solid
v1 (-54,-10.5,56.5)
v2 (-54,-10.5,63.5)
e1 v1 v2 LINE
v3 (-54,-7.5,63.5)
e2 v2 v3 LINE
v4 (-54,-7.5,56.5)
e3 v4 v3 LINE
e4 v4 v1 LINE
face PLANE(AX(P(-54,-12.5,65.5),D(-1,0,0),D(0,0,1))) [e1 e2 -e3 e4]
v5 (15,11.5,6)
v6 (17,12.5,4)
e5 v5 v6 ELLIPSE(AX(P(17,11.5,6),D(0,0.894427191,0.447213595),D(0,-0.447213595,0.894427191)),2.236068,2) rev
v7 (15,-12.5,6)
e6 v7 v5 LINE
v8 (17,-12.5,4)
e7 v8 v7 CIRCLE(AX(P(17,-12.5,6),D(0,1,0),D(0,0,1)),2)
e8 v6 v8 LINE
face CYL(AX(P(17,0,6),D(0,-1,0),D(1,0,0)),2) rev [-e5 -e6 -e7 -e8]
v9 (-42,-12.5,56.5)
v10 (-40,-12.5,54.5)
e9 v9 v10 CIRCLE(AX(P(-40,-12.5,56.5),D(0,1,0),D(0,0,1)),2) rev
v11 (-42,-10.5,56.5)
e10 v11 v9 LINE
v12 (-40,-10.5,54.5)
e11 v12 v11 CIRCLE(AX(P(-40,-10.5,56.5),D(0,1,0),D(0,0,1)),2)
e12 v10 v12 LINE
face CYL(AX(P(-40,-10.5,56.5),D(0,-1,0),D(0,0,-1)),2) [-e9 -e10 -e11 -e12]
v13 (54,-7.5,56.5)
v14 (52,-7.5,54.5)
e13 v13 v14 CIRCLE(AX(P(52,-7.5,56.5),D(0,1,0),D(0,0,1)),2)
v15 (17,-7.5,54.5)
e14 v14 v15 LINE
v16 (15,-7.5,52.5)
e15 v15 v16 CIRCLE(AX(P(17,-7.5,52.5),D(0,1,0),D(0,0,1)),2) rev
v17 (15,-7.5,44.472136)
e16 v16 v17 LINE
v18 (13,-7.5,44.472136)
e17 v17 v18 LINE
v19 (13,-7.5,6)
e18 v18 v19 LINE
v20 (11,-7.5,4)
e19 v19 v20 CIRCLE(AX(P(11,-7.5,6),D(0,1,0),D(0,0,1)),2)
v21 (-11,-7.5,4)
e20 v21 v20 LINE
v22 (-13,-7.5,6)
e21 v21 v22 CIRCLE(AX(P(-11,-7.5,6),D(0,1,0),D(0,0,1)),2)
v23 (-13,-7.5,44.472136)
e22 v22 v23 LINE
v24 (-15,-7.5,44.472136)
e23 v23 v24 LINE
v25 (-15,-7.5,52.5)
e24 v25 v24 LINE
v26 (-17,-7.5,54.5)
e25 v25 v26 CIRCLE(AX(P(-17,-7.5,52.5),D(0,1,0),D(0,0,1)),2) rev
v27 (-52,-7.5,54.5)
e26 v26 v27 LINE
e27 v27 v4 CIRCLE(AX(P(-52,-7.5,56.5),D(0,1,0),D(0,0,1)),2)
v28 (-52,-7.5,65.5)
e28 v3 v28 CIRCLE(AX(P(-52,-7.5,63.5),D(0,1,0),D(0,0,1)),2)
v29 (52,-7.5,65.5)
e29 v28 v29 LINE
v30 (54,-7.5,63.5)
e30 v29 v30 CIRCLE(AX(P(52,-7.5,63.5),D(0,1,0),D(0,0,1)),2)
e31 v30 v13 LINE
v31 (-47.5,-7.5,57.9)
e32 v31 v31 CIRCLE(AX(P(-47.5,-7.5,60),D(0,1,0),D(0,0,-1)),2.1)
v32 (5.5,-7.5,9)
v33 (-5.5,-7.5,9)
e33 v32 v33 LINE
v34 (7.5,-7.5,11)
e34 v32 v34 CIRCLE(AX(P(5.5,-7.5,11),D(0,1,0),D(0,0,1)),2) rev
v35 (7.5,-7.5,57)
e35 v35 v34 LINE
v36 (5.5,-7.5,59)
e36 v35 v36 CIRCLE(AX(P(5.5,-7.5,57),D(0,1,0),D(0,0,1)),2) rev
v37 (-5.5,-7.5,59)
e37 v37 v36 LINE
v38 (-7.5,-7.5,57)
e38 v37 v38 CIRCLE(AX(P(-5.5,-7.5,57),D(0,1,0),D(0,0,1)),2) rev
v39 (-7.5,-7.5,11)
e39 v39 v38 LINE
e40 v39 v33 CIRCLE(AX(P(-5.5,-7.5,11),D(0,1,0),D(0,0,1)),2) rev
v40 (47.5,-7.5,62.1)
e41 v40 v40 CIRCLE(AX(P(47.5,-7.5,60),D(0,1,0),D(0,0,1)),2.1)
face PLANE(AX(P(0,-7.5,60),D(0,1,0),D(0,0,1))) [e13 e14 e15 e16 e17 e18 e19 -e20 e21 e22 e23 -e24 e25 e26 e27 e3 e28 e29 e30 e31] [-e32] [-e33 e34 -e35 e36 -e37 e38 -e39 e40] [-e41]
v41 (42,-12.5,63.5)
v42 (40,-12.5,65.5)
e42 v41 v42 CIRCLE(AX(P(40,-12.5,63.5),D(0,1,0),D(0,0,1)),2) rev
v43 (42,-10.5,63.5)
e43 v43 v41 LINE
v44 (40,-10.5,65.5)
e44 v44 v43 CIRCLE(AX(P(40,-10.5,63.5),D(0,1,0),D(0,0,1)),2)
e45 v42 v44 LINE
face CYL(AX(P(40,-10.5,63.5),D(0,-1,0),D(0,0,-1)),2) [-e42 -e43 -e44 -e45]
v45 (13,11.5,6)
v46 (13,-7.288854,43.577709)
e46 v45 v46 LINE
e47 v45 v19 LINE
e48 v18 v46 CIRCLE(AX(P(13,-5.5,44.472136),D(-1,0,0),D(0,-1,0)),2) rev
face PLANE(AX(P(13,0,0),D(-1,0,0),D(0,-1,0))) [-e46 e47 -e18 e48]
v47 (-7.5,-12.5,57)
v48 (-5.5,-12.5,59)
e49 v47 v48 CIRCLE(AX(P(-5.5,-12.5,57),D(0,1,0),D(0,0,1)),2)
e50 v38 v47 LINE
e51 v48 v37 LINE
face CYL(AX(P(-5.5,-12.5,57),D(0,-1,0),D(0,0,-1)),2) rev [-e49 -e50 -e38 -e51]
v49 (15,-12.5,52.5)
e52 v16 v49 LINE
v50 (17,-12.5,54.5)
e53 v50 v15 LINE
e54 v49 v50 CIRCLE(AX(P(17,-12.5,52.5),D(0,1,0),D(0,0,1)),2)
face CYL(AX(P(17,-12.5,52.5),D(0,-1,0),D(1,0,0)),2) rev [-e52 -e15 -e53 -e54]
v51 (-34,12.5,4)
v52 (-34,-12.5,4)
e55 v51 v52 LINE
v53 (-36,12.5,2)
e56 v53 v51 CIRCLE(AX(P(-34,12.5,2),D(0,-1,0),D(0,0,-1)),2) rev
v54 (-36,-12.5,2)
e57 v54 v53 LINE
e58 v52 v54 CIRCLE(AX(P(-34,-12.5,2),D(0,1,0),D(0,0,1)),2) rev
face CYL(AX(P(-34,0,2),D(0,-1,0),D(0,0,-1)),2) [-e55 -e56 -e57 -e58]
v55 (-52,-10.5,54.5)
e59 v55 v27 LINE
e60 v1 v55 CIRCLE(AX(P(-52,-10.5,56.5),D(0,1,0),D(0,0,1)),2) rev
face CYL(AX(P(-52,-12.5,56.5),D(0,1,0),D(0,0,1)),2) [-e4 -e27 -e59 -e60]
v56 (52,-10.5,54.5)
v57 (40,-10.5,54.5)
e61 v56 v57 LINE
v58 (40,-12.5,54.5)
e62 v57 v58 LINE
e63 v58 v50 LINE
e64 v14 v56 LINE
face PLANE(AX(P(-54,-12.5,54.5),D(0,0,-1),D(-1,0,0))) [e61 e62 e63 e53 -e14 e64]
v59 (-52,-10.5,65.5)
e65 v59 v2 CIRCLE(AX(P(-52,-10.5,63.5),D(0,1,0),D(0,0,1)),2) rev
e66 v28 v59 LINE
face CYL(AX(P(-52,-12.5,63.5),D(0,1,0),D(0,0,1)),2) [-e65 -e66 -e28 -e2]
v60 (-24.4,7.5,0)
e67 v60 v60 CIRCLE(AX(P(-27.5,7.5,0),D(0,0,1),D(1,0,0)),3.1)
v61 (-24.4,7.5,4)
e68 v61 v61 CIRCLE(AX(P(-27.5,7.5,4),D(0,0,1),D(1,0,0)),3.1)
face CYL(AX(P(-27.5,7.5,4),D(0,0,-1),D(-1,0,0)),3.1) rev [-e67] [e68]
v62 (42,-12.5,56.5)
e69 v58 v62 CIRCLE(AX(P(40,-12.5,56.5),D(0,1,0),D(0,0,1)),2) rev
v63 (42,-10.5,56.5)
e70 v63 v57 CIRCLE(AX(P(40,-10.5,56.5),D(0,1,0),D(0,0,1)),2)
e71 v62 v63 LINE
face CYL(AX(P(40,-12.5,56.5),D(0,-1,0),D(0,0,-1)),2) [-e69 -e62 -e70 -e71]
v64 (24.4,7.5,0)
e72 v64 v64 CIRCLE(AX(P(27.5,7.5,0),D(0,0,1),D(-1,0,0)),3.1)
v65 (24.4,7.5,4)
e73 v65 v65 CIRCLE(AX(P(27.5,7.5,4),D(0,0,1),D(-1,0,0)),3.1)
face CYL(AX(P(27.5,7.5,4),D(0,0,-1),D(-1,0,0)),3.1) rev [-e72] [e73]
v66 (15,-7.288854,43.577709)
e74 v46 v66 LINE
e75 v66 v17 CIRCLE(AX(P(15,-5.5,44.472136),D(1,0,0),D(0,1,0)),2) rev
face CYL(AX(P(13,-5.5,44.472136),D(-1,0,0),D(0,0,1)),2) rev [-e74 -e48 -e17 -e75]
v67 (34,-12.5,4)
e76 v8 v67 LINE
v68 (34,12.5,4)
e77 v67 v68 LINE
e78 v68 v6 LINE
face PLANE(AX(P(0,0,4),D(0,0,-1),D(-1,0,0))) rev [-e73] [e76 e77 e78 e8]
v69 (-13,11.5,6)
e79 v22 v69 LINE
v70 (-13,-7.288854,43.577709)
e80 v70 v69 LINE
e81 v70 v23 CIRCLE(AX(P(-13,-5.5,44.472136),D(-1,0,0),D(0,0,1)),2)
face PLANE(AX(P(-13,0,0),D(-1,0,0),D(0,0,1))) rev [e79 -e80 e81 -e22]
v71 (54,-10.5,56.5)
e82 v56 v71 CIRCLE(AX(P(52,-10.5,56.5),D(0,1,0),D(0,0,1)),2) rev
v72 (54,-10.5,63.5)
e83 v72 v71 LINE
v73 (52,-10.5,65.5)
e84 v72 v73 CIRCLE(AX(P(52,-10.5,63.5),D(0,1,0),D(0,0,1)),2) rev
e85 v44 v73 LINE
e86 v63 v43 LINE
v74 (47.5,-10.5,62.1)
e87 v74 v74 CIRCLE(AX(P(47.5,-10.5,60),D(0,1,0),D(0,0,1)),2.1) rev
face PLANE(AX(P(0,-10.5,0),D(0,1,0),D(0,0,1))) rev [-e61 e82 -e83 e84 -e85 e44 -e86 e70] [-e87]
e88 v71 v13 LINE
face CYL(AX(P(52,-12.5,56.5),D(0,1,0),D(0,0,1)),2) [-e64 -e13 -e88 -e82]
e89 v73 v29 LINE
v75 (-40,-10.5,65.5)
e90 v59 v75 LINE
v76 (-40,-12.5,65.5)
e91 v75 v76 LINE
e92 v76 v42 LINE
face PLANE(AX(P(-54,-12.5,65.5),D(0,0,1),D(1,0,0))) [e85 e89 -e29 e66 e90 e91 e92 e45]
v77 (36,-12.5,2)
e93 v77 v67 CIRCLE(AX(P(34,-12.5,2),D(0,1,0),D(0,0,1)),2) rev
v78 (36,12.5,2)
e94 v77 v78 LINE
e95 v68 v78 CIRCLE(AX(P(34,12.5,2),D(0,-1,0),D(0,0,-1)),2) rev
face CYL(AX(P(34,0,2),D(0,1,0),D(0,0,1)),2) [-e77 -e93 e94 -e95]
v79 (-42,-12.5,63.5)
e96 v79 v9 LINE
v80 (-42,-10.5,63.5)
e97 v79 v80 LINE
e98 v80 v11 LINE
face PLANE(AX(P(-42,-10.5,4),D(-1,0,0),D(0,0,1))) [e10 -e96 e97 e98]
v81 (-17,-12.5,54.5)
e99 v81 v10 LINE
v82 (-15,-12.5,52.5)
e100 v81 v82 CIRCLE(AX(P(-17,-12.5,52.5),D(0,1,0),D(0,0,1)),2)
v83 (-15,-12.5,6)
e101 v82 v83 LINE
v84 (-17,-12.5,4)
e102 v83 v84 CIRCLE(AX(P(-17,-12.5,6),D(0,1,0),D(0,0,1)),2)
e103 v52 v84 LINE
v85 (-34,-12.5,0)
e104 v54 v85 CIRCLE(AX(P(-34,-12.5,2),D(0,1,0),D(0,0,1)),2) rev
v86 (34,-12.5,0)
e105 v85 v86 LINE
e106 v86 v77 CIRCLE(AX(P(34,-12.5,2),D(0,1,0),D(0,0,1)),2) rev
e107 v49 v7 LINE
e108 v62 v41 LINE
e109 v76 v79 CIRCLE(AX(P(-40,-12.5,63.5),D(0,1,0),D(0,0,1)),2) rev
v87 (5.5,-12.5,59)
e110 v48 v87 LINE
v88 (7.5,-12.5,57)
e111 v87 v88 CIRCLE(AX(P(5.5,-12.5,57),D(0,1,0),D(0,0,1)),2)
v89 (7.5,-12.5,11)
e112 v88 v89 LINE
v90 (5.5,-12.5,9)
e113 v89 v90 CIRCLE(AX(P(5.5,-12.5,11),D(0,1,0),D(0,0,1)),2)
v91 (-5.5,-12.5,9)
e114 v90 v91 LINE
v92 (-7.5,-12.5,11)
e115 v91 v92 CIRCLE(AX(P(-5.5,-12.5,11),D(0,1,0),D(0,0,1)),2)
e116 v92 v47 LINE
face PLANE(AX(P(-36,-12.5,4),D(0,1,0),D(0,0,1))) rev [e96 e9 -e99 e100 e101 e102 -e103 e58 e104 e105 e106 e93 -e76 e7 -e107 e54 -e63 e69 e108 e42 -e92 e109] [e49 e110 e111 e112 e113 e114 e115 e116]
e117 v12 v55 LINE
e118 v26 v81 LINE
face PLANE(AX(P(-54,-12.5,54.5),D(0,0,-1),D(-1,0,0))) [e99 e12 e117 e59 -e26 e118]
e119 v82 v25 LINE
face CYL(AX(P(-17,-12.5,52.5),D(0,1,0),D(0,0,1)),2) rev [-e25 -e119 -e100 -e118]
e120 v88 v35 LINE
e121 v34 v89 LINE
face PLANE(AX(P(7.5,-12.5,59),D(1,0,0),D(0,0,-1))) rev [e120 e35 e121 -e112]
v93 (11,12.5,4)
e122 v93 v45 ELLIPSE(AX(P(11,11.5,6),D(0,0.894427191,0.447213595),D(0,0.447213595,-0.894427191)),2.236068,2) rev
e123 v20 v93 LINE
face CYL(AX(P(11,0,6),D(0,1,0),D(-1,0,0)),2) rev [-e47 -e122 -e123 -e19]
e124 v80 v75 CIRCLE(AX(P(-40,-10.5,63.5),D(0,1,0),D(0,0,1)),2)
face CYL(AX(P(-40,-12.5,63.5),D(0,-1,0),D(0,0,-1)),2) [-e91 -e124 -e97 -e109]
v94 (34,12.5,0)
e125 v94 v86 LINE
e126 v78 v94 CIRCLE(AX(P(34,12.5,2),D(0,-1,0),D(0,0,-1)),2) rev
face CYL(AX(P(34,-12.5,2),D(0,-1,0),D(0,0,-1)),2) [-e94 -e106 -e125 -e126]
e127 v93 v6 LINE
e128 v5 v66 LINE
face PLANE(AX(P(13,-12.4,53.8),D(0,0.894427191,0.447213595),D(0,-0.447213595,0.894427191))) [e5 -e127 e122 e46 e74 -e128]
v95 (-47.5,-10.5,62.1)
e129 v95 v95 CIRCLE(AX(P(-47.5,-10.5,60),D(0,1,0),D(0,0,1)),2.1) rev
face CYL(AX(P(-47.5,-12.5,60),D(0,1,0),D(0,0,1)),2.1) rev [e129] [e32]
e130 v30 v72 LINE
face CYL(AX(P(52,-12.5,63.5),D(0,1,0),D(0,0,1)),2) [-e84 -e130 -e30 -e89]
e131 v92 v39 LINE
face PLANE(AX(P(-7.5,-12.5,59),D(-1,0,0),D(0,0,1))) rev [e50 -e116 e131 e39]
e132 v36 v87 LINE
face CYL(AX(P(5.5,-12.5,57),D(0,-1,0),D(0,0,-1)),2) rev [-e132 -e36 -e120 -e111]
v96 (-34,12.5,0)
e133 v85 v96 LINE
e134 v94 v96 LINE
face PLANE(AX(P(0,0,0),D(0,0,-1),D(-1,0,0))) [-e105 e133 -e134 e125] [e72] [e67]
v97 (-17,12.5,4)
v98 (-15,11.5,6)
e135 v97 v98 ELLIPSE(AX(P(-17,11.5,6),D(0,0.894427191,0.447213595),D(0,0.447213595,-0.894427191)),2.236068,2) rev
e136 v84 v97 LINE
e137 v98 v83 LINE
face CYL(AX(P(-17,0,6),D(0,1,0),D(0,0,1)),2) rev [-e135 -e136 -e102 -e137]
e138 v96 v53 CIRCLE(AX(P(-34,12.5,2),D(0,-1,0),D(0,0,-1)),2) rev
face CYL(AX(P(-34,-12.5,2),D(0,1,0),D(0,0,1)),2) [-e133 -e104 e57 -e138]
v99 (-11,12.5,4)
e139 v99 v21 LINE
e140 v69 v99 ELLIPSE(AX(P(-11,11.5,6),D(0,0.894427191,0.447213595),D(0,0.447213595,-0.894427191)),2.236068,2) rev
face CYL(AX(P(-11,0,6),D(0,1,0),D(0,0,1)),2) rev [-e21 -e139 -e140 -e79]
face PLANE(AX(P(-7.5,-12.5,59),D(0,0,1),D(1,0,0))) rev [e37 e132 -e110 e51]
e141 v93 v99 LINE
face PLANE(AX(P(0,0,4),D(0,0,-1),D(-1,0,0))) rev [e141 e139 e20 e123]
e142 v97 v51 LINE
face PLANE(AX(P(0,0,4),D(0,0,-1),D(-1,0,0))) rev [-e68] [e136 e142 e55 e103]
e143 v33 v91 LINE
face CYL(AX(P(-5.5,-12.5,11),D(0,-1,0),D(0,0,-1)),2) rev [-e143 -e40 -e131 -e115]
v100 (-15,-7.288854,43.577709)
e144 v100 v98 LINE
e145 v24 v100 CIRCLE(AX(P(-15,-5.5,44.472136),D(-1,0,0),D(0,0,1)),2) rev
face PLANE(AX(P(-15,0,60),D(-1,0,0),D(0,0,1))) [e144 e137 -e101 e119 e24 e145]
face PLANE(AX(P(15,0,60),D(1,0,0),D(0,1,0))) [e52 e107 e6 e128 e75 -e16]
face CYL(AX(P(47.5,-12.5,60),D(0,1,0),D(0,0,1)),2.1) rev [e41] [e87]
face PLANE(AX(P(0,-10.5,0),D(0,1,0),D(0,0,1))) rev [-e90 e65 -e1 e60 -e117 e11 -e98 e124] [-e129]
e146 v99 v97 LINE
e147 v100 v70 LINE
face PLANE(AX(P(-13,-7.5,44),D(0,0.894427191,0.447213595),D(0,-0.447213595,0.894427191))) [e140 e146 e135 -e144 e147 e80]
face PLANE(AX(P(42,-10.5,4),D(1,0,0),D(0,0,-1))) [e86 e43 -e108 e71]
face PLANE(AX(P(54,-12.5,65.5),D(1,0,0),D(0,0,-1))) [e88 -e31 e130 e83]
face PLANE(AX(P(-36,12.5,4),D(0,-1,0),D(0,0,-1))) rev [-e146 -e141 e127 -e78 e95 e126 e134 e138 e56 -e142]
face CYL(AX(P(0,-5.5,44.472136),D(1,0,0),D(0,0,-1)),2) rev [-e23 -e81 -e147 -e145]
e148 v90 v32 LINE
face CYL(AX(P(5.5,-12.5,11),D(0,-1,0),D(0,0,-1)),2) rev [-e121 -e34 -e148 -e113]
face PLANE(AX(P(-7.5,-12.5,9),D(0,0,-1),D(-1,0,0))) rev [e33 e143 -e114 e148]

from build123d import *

# Parameters (mm, degrees)
SKETCH_1_W          = 72
SKETCH_1_H          = 25
SKETCH_1_R          = 3.1
EXTRUDE_1_DEPTH     = 4
EXTRUDE_START       = -4
SKETCH_3_W          = 30
SKETCH_3_H          = 5
EXTRUDE_2_DEPTH     = 60
SKETCH_5_W          = 108
SKETCH_5_H          = 11
SKETCH_5_R          = 2.1
EXTRUDE_3_DEPTH     = 5
CUT_EXTRUDE_START   = -5
SKETCH_6_W          = 12
SKETCH_6_H          = 11
CUT_EXTRUDE_1_DEPTH = 2
SKETCH_7_W          = 15
SKETCH_7_H          = 50
CUT_EXTRUDE_2_DEPTH = 88.213817713
EXTRUDE_4_DEPTH     = 2
EXTRUDE_START_2     = -30
EXTRUDE_5_DEPTH     = 2
FILLET_1_R          = 2


with BuildPart() as part:
    # 草图1 → 凸台-拉伸1 (new body)
    with BuildSketch(Plane.XY):
        Rectangle(SKETCH_1_W, SKETCH_1_H)
        with Locations((-27.5, 7.5)):
            Circle(SKETCH_1_R, mode=Mode.SUBTRACT)
        with Locations(Location((27.5, 7.5, 0), (0, 0, 180))):
            Circle(SKETCH_1_R, mode=Mode.SUBTRACT)
    extrude(amount=EXTRUDE_1_DEPTH)

    # 草图3 → 凸台-拉伸2 (add)
    with BuildSketch(Plane.XY.offset(4).offset(EXTRUDE_START)):
        with Locations((0, -10)):
            Rectangle(SKETCH_3_W, SKETCH_3_H)
    extrude(amount=EXTRUDE_2_DEPTH)

    # 草图5 → 凸台-拉伸3 (add, through all)
    with BuildSketch(Plane(origin=(0, -7.5, 0), x_dir=(1, 0, 0), z_dir=(0, 1, 0))):
        with Locations((0, -60)):
            Rectangle(SKETCH_5_W, SKETCH_5_H)
        with Locations(Location((47.5, -60, 0), (0, 0, 270))):
            Circle(SKETCH_5_R, mode=Mode.SUBTRACT)
        with Locations(Location((-47.5, -60, 0), (0, 0, 90))):
            Circle(SKETCH_5_R, mode=Mode.SUBTRACT)
    extrude(amount=-EXTRUDE_3_DEPTH)

    # 草图6 → 切除-拉伸1 (cut)
    with BuildSketch(Plane(origin=(0, -7.5, 0), x_dir=(1, 0, 0), z_dir=(0, 1, 0)).offset(CUT_EXTRUDE_START)):
        with Locations((-48, -60)):
            Rectangle(SKETCH_6_W, SKETCH_6_H)
        with Locations((48, -60)):
            Rectangle(SKETCH_6_W, SKETCH_6_H)
    extrude(amount=CUT_EXTRUDE_1_DEPTH, mode=Mode.SUBTRACT)

    # 草图7 → 切除-拉伸2 (cut, through all)
    with BuildSketch(Plane(origin=(0, -7.5, 0), x_dir=(1, 0, 0), z_dir=(0, 1, 0))):
        with Locations((0, -34)):
            Rectangle(SKETCH_7_W, SKETCH_7_H)
    extrude(amount=-CUT_EXTRUDE_2_DEPTH, mode=Mode.SUBTRACT)

    # 草图8 → 凸台-拉伸4 (add)
    with BuildSketch(Plane.ZY.offset(15)):
        Polygon((4, -7.5), (44, -7.5), (4, 12.5), align=None)
    extrude(amount=-EXTRUDE_4_DEPTH)

    # 草图8<2> → 凸台-拉伸5 (add)
    with BuildSketch(Plane.ZY.offset(15).offset(EXTRUDE_START_2)):
        Polygon((4, -7.5), (44, -7.5), (4, 12.5), align=None)
    extrude(amount=EXTRUDE_5_DEPTH)

    # 圆角1
    fillet_1_edges = [part.edges().sort_by_distance(p)[0] for p in [
        (15, 0, 4),
        (36, 0, 4),
        (36, 0, 0),
        (-36, 0, 0),
        (-36, 0, 4),
        (-15, -10, 54.5),
        (-54, -9, 54.5),
        (-54, -9, 65.5),
        (54, -9, 65.5),
        (54, -9, 54.5),
        (15, -10, 54.5),
        (-15, 0, 4),
        (-42, -11.5, 54.5),
        (42, -11.5, 54.5),
        (42, -11.5, 65.5),
        (-42, -11.5, 65.5),
        (-7.5, -10, 59),
        (-7.5, -10, 9),
        (7.5, -10, 59),
        (7.5, -10, 9),
        (14, -7.5, 44),
        (-14, -7.5, 44),
        (-13, 2.5, 4),
        (13, 2.5, 4),
    ]]
    fillet(fillet_1_edges, radius=FILLET_1_R - 0.0001)  # a hair under: the kernel refuses the full size


solid = part.part
